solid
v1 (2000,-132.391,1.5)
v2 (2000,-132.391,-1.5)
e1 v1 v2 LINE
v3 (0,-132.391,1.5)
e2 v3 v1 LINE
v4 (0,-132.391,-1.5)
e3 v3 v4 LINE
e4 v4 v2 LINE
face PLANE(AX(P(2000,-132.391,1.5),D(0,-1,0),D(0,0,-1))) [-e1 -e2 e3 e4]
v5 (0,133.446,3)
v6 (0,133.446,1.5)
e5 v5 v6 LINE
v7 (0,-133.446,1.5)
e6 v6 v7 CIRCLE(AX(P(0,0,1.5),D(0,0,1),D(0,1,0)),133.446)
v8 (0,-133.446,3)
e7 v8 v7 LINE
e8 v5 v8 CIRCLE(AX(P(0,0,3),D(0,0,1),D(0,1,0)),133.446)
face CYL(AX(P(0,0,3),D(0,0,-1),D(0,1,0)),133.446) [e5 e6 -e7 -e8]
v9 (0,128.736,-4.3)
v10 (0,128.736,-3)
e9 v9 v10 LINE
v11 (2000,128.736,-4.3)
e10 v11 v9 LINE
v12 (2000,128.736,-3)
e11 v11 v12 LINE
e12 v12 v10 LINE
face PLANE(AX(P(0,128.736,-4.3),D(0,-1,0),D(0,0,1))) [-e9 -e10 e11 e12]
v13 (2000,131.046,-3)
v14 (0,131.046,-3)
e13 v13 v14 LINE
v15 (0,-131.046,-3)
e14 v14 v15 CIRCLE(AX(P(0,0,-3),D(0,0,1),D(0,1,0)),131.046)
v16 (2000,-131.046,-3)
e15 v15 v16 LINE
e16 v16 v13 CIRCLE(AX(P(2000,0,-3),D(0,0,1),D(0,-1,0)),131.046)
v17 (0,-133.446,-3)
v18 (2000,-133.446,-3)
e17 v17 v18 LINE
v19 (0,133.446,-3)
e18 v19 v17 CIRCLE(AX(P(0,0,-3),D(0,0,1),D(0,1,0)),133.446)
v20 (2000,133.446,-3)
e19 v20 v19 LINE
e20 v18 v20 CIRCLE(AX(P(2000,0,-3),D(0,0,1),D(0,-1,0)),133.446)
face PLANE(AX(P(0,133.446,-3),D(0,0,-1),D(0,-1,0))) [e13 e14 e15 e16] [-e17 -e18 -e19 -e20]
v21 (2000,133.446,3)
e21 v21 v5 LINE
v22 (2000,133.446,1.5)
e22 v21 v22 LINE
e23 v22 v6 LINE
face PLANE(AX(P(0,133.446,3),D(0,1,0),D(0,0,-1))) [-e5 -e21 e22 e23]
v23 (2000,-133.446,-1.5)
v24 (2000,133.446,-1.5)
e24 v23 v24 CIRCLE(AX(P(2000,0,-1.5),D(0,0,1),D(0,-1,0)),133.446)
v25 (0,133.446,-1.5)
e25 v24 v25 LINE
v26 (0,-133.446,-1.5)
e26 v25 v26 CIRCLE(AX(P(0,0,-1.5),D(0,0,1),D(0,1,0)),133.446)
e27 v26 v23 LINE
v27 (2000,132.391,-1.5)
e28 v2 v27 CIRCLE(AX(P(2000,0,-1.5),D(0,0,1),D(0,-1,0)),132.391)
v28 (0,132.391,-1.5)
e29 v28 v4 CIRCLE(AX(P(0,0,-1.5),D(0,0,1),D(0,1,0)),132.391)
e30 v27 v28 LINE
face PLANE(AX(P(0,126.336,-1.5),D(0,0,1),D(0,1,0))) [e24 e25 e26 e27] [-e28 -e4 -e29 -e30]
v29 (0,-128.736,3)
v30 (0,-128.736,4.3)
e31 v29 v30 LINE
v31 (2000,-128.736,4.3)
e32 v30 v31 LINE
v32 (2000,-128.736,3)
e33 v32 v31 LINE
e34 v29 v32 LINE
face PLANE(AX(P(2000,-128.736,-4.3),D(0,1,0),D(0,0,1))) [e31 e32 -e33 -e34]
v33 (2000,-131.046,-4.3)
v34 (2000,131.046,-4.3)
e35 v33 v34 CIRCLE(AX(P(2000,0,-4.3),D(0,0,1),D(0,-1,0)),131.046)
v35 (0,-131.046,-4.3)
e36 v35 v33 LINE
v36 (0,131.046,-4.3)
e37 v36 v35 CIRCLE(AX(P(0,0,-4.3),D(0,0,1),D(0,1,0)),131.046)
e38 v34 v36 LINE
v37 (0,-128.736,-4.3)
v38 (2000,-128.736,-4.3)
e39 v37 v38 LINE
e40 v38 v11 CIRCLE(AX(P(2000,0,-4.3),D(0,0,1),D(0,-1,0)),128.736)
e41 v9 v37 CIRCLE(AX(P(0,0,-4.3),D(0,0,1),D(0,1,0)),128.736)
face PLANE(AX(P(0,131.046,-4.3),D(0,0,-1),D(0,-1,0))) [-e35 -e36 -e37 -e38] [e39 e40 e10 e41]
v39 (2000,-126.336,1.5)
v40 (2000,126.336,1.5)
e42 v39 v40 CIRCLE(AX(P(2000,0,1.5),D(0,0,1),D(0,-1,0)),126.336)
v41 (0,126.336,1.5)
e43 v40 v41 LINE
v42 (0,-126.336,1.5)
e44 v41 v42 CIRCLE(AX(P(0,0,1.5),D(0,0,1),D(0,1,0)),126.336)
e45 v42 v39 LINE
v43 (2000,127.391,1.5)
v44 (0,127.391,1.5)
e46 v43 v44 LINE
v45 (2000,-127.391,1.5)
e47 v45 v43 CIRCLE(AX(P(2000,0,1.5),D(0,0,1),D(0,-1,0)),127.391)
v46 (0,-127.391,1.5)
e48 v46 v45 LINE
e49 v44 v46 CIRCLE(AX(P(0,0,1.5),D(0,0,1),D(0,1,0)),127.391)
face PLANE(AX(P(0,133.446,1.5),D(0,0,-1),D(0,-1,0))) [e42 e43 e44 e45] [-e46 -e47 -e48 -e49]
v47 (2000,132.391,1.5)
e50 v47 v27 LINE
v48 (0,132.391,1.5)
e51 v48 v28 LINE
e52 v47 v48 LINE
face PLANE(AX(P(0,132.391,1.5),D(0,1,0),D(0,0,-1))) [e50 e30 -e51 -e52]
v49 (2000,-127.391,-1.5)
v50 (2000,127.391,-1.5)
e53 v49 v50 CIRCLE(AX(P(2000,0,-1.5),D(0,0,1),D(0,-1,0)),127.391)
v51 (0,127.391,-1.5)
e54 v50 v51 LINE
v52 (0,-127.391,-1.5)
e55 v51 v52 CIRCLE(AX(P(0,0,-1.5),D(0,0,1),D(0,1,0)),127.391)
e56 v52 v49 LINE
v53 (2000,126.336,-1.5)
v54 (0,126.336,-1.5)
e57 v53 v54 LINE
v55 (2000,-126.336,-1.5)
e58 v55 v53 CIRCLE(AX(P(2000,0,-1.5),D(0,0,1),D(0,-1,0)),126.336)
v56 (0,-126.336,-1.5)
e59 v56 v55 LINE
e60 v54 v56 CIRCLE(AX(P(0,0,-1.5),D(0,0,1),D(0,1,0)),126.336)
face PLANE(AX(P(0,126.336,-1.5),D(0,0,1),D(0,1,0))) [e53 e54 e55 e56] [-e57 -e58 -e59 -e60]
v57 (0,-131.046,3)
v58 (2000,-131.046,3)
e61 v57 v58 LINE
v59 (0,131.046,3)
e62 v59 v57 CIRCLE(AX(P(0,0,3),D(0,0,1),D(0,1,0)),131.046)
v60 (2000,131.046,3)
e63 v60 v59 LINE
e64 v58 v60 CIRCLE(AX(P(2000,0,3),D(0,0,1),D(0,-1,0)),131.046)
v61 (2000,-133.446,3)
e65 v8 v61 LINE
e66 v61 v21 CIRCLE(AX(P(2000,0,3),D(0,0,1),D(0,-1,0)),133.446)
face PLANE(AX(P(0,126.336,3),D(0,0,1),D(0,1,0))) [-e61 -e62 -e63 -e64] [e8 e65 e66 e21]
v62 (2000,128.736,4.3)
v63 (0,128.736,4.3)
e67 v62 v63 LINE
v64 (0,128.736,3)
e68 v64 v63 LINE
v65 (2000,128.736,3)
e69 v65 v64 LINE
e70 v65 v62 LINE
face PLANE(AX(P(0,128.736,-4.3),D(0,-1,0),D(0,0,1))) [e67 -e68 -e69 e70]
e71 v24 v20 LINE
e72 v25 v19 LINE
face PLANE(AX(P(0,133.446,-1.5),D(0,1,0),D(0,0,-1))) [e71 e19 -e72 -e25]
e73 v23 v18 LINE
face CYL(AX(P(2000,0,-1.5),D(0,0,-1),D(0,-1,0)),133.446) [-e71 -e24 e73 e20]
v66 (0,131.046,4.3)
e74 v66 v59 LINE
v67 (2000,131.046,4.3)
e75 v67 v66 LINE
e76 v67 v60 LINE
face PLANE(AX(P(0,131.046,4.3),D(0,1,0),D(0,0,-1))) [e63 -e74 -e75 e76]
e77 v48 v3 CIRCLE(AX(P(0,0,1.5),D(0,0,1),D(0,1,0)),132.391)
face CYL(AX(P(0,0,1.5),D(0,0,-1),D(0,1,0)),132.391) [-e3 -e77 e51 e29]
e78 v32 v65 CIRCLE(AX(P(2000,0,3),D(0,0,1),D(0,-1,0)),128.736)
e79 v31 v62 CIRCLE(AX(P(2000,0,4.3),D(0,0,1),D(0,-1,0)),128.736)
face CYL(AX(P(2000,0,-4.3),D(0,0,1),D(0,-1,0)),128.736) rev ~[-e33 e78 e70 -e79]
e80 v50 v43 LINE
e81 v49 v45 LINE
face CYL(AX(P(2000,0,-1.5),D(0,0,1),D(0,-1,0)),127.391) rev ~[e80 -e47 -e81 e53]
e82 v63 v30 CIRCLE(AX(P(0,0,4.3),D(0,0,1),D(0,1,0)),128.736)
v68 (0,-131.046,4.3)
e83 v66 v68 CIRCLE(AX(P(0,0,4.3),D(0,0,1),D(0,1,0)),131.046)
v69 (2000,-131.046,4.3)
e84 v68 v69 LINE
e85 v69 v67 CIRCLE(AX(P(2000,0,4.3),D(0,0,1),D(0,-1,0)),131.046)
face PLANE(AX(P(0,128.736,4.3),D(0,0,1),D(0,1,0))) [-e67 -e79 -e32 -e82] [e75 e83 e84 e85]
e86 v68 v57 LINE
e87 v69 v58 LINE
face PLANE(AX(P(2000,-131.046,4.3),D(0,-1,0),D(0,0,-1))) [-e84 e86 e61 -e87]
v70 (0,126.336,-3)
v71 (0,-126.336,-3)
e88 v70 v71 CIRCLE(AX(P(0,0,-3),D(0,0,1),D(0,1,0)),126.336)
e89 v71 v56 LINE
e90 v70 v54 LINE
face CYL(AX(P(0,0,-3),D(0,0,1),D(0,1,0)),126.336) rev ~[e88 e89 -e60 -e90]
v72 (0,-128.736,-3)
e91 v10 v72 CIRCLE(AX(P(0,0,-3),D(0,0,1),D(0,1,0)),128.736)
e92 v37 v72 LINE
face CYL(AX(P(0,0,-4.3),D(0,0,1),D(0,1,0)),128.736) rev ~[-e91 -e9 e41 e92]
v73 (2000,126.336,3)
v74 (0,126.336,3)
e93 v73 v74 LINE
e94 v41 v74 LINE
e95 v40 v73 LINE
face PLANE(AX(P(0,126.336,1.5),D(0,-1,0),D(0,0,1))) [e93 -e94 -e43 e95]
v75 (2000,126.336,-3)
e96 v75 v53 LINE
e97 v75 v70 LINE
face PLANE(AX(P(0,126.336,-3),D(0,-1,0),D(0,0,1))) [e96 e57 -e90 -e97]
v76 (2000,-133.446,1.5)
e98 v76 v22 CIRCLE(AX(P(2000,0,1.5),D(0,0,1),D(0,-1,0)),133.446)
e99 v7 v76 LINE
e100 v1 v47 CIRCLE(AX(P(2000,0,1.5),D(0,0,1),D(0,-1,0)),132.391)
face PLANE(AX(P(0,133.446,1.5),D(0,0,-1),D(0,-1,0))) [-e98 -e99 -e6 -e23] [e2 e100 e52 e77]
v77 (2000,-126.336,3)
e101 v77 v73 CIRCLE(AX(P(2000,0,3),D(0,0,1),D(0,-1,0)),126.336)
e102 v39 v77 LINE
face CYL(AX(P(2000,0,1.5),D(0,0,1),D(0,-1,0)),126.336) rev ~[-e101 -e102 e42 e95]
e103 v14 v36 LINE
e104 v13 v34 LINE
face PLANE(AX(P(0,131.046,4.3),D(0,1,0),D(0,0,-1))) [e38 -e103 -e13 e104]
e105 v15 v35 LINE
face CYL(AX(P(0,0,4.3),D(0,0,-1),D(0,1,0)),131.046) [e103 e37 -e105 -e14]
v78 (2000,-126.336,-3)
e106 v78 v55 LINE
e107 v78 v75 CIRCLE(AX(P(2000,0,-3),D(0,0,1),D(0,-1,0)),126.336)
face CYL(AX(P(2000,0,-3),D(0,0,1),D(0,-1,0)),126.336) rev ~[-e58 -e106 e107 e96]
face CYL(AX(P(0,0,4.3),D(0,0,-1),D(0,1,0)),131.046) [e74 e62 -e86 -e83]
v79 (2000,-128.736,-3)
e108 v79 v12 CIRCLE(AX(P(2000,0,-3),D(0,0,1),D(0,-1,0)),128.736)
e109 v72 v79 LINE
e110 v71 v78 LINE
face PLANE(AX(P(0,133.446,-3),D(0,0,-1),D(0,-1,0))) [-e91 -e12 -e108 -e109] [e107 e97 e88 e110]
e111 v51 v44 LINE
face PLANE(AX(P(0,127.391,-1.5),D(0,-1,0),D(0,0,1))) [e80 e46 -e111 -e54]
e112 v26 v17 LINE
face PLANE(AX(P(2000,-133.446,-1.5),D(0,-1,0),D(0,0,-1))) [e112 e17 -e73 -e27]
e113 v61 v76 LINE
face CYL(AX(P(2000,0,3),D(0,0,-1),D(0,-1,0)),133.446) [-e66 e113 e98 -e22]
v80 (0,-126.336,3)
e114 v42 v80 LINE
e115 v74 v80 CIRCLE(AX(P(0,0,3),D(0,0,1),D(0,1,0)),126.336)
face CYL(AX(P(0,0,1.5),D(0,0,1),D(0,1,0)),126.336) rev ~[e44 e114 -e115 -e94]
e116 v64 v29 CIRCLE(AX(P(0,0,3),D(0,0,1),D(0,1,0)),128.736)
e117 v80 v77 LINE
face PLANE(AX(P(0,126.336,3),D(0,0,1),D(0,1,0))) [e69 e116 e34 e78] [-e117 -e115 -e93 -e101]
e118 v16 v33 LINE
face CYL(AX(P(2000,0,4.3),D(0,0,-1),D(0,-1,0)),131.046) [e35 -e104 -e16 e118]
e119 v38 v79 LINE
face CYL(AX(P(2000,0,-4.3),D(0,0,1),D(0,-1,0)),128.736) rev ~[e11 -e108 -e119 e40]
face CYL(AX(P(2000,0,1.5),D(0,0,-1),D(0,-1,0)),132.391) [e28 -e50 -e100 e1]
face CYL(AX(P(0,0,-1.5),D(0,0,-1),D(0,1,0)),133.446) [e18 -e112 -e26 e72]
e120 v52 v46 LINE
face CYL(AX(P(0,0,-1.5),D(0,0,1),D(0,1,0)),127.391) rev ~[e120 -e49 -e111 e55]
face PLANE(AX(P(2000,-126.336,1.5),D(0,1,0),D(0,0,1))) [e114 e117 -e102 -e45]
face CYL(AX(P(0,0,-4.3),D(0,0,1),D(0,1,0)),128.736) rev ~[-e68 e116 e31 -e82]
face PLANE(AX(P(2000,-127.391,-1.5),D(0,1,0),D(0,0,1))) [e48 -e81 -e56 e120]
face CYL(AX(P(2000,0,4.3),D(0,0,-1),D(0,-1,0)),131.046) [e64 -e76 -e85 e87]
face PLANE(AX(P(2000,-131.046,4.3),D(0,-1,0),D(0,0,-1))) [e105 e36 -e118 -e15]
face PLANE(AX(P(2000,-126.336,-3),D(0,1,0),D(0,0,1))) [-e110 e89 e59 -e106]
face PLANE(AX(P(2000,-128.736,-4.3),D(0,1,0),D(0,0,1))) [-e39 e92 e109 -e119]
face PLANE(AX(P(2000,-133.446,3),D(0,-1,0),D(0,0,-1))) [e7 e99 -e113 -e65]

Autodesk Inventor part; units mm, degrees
ref_plane "Plano de trabajo2" through (0, 0, 0) normal (-1, 0, 0) x (0, 0, 1)
ref_plane "Plano de trabajo3" through (2000, 0, 0) normal (-1, 0, 0) x (0, 0, 1)
sketch "Trayectoria" plane through (0, 0, 0) normal (0, 0, 1) x (1, 0, 0)
  arc A0 (0, 129.891) -> (0, -129.891) centre (0, 0) ccw
  arc A1 (2000, -129.891) -> (2000, 129.891) centre (2000, 0) ccw
  line L0 (2000, -129.891) -> (0, -129.891)
  line L1 (0, 129.891) -> (2000, 129.891)
  dimension "d31" = 7.11
ref_plane "Plano de sección" through (0, -129.891, 0) normal (1, 0, 0) x (0, 0, 1)
sketch "Boceto de sección" plane through (0, -129.891, 0) normal (1, 0, 0) x (0, 0, 1)
  line L0 (-4.3, -1.155) -> (4.3, -1.155)
  line L1 (4.3, -1.155) -> (4.3, 1.155)
  line L2 (4.3, 1.155) -> (-4.3, 1.155)
  line L3 (-4.3, 1.155) -> (-4.3, -1.155)
  line L4 (-1.5, -2.5) -> (1.5, -2.5)
  line L5 (1.5, -2.5) -> (1.5, 2.5)
  line L6 (1.5, 2.5) -> (-1.5, 2.5)
  line L7 (-1.5, 2.5) -> (-1.5, -2.5)
  line L8 (-1.5, 0) -> (1.5, 0) construction
  line L9 (-3, -3.555) -> (-1.5, -3.555)
  line L10 (-1.5, -3.555) -> (-1.5, 3.555)
  line L11 (-1.5, 3.555) -> (-3, 3.555)
  line L12 (-3, 3.555) -> (-3, -3.555)
  line L13 (1.5, -3.555) -> (3, -3.555)
  line L14 (3, -3.555) -> (3, 3.555)
  line L15 (3, 3.555) -> (1.5, 3.555)
  line L16 (1.5, 3.555) -> (1.5, -3.555)
  line L17 (-4.3, 0) -> (4.3, 0) construction
  point P0 (0, 0)
  point P1 (0, 0)
  dimension "d21" = 2.31
  dimension "d22" = 5
  dimension "d23" = 3
  dimension "d24" = 1.5
  dimension "d31" = 7.11
  dimension "d32" = 8.6
sweep "Sólido" add profiles "Boceto de sección" path "Trayectoria"
pattern_of_one "Strand Pattern"
equation "\"d21\" = da_d2"
equation "\"d22\" = da_d1"
equation "\"d23\" = da_b1"
equation "\"d24\" = da_t1 + da_t2"
equation "\"d30\" = da_pt"
equation "\"da_p\" = 8"
equation "\"da_b1\" = 3"
equation "\"da_h2\" = 7.11"
equation "\"da_h3\" = 7.11"
equation "\"da_d1\" = 5"
equation "\"da_d2\" = 2.31"
equation "\"da_pt\" = 5.64"
equation "\"da_b\" = 8.6"
equation "\"da_t1\" = 0.75"
equation "\"da_t2\" = 0.75"
properties part number "Cadena de rodillos"
